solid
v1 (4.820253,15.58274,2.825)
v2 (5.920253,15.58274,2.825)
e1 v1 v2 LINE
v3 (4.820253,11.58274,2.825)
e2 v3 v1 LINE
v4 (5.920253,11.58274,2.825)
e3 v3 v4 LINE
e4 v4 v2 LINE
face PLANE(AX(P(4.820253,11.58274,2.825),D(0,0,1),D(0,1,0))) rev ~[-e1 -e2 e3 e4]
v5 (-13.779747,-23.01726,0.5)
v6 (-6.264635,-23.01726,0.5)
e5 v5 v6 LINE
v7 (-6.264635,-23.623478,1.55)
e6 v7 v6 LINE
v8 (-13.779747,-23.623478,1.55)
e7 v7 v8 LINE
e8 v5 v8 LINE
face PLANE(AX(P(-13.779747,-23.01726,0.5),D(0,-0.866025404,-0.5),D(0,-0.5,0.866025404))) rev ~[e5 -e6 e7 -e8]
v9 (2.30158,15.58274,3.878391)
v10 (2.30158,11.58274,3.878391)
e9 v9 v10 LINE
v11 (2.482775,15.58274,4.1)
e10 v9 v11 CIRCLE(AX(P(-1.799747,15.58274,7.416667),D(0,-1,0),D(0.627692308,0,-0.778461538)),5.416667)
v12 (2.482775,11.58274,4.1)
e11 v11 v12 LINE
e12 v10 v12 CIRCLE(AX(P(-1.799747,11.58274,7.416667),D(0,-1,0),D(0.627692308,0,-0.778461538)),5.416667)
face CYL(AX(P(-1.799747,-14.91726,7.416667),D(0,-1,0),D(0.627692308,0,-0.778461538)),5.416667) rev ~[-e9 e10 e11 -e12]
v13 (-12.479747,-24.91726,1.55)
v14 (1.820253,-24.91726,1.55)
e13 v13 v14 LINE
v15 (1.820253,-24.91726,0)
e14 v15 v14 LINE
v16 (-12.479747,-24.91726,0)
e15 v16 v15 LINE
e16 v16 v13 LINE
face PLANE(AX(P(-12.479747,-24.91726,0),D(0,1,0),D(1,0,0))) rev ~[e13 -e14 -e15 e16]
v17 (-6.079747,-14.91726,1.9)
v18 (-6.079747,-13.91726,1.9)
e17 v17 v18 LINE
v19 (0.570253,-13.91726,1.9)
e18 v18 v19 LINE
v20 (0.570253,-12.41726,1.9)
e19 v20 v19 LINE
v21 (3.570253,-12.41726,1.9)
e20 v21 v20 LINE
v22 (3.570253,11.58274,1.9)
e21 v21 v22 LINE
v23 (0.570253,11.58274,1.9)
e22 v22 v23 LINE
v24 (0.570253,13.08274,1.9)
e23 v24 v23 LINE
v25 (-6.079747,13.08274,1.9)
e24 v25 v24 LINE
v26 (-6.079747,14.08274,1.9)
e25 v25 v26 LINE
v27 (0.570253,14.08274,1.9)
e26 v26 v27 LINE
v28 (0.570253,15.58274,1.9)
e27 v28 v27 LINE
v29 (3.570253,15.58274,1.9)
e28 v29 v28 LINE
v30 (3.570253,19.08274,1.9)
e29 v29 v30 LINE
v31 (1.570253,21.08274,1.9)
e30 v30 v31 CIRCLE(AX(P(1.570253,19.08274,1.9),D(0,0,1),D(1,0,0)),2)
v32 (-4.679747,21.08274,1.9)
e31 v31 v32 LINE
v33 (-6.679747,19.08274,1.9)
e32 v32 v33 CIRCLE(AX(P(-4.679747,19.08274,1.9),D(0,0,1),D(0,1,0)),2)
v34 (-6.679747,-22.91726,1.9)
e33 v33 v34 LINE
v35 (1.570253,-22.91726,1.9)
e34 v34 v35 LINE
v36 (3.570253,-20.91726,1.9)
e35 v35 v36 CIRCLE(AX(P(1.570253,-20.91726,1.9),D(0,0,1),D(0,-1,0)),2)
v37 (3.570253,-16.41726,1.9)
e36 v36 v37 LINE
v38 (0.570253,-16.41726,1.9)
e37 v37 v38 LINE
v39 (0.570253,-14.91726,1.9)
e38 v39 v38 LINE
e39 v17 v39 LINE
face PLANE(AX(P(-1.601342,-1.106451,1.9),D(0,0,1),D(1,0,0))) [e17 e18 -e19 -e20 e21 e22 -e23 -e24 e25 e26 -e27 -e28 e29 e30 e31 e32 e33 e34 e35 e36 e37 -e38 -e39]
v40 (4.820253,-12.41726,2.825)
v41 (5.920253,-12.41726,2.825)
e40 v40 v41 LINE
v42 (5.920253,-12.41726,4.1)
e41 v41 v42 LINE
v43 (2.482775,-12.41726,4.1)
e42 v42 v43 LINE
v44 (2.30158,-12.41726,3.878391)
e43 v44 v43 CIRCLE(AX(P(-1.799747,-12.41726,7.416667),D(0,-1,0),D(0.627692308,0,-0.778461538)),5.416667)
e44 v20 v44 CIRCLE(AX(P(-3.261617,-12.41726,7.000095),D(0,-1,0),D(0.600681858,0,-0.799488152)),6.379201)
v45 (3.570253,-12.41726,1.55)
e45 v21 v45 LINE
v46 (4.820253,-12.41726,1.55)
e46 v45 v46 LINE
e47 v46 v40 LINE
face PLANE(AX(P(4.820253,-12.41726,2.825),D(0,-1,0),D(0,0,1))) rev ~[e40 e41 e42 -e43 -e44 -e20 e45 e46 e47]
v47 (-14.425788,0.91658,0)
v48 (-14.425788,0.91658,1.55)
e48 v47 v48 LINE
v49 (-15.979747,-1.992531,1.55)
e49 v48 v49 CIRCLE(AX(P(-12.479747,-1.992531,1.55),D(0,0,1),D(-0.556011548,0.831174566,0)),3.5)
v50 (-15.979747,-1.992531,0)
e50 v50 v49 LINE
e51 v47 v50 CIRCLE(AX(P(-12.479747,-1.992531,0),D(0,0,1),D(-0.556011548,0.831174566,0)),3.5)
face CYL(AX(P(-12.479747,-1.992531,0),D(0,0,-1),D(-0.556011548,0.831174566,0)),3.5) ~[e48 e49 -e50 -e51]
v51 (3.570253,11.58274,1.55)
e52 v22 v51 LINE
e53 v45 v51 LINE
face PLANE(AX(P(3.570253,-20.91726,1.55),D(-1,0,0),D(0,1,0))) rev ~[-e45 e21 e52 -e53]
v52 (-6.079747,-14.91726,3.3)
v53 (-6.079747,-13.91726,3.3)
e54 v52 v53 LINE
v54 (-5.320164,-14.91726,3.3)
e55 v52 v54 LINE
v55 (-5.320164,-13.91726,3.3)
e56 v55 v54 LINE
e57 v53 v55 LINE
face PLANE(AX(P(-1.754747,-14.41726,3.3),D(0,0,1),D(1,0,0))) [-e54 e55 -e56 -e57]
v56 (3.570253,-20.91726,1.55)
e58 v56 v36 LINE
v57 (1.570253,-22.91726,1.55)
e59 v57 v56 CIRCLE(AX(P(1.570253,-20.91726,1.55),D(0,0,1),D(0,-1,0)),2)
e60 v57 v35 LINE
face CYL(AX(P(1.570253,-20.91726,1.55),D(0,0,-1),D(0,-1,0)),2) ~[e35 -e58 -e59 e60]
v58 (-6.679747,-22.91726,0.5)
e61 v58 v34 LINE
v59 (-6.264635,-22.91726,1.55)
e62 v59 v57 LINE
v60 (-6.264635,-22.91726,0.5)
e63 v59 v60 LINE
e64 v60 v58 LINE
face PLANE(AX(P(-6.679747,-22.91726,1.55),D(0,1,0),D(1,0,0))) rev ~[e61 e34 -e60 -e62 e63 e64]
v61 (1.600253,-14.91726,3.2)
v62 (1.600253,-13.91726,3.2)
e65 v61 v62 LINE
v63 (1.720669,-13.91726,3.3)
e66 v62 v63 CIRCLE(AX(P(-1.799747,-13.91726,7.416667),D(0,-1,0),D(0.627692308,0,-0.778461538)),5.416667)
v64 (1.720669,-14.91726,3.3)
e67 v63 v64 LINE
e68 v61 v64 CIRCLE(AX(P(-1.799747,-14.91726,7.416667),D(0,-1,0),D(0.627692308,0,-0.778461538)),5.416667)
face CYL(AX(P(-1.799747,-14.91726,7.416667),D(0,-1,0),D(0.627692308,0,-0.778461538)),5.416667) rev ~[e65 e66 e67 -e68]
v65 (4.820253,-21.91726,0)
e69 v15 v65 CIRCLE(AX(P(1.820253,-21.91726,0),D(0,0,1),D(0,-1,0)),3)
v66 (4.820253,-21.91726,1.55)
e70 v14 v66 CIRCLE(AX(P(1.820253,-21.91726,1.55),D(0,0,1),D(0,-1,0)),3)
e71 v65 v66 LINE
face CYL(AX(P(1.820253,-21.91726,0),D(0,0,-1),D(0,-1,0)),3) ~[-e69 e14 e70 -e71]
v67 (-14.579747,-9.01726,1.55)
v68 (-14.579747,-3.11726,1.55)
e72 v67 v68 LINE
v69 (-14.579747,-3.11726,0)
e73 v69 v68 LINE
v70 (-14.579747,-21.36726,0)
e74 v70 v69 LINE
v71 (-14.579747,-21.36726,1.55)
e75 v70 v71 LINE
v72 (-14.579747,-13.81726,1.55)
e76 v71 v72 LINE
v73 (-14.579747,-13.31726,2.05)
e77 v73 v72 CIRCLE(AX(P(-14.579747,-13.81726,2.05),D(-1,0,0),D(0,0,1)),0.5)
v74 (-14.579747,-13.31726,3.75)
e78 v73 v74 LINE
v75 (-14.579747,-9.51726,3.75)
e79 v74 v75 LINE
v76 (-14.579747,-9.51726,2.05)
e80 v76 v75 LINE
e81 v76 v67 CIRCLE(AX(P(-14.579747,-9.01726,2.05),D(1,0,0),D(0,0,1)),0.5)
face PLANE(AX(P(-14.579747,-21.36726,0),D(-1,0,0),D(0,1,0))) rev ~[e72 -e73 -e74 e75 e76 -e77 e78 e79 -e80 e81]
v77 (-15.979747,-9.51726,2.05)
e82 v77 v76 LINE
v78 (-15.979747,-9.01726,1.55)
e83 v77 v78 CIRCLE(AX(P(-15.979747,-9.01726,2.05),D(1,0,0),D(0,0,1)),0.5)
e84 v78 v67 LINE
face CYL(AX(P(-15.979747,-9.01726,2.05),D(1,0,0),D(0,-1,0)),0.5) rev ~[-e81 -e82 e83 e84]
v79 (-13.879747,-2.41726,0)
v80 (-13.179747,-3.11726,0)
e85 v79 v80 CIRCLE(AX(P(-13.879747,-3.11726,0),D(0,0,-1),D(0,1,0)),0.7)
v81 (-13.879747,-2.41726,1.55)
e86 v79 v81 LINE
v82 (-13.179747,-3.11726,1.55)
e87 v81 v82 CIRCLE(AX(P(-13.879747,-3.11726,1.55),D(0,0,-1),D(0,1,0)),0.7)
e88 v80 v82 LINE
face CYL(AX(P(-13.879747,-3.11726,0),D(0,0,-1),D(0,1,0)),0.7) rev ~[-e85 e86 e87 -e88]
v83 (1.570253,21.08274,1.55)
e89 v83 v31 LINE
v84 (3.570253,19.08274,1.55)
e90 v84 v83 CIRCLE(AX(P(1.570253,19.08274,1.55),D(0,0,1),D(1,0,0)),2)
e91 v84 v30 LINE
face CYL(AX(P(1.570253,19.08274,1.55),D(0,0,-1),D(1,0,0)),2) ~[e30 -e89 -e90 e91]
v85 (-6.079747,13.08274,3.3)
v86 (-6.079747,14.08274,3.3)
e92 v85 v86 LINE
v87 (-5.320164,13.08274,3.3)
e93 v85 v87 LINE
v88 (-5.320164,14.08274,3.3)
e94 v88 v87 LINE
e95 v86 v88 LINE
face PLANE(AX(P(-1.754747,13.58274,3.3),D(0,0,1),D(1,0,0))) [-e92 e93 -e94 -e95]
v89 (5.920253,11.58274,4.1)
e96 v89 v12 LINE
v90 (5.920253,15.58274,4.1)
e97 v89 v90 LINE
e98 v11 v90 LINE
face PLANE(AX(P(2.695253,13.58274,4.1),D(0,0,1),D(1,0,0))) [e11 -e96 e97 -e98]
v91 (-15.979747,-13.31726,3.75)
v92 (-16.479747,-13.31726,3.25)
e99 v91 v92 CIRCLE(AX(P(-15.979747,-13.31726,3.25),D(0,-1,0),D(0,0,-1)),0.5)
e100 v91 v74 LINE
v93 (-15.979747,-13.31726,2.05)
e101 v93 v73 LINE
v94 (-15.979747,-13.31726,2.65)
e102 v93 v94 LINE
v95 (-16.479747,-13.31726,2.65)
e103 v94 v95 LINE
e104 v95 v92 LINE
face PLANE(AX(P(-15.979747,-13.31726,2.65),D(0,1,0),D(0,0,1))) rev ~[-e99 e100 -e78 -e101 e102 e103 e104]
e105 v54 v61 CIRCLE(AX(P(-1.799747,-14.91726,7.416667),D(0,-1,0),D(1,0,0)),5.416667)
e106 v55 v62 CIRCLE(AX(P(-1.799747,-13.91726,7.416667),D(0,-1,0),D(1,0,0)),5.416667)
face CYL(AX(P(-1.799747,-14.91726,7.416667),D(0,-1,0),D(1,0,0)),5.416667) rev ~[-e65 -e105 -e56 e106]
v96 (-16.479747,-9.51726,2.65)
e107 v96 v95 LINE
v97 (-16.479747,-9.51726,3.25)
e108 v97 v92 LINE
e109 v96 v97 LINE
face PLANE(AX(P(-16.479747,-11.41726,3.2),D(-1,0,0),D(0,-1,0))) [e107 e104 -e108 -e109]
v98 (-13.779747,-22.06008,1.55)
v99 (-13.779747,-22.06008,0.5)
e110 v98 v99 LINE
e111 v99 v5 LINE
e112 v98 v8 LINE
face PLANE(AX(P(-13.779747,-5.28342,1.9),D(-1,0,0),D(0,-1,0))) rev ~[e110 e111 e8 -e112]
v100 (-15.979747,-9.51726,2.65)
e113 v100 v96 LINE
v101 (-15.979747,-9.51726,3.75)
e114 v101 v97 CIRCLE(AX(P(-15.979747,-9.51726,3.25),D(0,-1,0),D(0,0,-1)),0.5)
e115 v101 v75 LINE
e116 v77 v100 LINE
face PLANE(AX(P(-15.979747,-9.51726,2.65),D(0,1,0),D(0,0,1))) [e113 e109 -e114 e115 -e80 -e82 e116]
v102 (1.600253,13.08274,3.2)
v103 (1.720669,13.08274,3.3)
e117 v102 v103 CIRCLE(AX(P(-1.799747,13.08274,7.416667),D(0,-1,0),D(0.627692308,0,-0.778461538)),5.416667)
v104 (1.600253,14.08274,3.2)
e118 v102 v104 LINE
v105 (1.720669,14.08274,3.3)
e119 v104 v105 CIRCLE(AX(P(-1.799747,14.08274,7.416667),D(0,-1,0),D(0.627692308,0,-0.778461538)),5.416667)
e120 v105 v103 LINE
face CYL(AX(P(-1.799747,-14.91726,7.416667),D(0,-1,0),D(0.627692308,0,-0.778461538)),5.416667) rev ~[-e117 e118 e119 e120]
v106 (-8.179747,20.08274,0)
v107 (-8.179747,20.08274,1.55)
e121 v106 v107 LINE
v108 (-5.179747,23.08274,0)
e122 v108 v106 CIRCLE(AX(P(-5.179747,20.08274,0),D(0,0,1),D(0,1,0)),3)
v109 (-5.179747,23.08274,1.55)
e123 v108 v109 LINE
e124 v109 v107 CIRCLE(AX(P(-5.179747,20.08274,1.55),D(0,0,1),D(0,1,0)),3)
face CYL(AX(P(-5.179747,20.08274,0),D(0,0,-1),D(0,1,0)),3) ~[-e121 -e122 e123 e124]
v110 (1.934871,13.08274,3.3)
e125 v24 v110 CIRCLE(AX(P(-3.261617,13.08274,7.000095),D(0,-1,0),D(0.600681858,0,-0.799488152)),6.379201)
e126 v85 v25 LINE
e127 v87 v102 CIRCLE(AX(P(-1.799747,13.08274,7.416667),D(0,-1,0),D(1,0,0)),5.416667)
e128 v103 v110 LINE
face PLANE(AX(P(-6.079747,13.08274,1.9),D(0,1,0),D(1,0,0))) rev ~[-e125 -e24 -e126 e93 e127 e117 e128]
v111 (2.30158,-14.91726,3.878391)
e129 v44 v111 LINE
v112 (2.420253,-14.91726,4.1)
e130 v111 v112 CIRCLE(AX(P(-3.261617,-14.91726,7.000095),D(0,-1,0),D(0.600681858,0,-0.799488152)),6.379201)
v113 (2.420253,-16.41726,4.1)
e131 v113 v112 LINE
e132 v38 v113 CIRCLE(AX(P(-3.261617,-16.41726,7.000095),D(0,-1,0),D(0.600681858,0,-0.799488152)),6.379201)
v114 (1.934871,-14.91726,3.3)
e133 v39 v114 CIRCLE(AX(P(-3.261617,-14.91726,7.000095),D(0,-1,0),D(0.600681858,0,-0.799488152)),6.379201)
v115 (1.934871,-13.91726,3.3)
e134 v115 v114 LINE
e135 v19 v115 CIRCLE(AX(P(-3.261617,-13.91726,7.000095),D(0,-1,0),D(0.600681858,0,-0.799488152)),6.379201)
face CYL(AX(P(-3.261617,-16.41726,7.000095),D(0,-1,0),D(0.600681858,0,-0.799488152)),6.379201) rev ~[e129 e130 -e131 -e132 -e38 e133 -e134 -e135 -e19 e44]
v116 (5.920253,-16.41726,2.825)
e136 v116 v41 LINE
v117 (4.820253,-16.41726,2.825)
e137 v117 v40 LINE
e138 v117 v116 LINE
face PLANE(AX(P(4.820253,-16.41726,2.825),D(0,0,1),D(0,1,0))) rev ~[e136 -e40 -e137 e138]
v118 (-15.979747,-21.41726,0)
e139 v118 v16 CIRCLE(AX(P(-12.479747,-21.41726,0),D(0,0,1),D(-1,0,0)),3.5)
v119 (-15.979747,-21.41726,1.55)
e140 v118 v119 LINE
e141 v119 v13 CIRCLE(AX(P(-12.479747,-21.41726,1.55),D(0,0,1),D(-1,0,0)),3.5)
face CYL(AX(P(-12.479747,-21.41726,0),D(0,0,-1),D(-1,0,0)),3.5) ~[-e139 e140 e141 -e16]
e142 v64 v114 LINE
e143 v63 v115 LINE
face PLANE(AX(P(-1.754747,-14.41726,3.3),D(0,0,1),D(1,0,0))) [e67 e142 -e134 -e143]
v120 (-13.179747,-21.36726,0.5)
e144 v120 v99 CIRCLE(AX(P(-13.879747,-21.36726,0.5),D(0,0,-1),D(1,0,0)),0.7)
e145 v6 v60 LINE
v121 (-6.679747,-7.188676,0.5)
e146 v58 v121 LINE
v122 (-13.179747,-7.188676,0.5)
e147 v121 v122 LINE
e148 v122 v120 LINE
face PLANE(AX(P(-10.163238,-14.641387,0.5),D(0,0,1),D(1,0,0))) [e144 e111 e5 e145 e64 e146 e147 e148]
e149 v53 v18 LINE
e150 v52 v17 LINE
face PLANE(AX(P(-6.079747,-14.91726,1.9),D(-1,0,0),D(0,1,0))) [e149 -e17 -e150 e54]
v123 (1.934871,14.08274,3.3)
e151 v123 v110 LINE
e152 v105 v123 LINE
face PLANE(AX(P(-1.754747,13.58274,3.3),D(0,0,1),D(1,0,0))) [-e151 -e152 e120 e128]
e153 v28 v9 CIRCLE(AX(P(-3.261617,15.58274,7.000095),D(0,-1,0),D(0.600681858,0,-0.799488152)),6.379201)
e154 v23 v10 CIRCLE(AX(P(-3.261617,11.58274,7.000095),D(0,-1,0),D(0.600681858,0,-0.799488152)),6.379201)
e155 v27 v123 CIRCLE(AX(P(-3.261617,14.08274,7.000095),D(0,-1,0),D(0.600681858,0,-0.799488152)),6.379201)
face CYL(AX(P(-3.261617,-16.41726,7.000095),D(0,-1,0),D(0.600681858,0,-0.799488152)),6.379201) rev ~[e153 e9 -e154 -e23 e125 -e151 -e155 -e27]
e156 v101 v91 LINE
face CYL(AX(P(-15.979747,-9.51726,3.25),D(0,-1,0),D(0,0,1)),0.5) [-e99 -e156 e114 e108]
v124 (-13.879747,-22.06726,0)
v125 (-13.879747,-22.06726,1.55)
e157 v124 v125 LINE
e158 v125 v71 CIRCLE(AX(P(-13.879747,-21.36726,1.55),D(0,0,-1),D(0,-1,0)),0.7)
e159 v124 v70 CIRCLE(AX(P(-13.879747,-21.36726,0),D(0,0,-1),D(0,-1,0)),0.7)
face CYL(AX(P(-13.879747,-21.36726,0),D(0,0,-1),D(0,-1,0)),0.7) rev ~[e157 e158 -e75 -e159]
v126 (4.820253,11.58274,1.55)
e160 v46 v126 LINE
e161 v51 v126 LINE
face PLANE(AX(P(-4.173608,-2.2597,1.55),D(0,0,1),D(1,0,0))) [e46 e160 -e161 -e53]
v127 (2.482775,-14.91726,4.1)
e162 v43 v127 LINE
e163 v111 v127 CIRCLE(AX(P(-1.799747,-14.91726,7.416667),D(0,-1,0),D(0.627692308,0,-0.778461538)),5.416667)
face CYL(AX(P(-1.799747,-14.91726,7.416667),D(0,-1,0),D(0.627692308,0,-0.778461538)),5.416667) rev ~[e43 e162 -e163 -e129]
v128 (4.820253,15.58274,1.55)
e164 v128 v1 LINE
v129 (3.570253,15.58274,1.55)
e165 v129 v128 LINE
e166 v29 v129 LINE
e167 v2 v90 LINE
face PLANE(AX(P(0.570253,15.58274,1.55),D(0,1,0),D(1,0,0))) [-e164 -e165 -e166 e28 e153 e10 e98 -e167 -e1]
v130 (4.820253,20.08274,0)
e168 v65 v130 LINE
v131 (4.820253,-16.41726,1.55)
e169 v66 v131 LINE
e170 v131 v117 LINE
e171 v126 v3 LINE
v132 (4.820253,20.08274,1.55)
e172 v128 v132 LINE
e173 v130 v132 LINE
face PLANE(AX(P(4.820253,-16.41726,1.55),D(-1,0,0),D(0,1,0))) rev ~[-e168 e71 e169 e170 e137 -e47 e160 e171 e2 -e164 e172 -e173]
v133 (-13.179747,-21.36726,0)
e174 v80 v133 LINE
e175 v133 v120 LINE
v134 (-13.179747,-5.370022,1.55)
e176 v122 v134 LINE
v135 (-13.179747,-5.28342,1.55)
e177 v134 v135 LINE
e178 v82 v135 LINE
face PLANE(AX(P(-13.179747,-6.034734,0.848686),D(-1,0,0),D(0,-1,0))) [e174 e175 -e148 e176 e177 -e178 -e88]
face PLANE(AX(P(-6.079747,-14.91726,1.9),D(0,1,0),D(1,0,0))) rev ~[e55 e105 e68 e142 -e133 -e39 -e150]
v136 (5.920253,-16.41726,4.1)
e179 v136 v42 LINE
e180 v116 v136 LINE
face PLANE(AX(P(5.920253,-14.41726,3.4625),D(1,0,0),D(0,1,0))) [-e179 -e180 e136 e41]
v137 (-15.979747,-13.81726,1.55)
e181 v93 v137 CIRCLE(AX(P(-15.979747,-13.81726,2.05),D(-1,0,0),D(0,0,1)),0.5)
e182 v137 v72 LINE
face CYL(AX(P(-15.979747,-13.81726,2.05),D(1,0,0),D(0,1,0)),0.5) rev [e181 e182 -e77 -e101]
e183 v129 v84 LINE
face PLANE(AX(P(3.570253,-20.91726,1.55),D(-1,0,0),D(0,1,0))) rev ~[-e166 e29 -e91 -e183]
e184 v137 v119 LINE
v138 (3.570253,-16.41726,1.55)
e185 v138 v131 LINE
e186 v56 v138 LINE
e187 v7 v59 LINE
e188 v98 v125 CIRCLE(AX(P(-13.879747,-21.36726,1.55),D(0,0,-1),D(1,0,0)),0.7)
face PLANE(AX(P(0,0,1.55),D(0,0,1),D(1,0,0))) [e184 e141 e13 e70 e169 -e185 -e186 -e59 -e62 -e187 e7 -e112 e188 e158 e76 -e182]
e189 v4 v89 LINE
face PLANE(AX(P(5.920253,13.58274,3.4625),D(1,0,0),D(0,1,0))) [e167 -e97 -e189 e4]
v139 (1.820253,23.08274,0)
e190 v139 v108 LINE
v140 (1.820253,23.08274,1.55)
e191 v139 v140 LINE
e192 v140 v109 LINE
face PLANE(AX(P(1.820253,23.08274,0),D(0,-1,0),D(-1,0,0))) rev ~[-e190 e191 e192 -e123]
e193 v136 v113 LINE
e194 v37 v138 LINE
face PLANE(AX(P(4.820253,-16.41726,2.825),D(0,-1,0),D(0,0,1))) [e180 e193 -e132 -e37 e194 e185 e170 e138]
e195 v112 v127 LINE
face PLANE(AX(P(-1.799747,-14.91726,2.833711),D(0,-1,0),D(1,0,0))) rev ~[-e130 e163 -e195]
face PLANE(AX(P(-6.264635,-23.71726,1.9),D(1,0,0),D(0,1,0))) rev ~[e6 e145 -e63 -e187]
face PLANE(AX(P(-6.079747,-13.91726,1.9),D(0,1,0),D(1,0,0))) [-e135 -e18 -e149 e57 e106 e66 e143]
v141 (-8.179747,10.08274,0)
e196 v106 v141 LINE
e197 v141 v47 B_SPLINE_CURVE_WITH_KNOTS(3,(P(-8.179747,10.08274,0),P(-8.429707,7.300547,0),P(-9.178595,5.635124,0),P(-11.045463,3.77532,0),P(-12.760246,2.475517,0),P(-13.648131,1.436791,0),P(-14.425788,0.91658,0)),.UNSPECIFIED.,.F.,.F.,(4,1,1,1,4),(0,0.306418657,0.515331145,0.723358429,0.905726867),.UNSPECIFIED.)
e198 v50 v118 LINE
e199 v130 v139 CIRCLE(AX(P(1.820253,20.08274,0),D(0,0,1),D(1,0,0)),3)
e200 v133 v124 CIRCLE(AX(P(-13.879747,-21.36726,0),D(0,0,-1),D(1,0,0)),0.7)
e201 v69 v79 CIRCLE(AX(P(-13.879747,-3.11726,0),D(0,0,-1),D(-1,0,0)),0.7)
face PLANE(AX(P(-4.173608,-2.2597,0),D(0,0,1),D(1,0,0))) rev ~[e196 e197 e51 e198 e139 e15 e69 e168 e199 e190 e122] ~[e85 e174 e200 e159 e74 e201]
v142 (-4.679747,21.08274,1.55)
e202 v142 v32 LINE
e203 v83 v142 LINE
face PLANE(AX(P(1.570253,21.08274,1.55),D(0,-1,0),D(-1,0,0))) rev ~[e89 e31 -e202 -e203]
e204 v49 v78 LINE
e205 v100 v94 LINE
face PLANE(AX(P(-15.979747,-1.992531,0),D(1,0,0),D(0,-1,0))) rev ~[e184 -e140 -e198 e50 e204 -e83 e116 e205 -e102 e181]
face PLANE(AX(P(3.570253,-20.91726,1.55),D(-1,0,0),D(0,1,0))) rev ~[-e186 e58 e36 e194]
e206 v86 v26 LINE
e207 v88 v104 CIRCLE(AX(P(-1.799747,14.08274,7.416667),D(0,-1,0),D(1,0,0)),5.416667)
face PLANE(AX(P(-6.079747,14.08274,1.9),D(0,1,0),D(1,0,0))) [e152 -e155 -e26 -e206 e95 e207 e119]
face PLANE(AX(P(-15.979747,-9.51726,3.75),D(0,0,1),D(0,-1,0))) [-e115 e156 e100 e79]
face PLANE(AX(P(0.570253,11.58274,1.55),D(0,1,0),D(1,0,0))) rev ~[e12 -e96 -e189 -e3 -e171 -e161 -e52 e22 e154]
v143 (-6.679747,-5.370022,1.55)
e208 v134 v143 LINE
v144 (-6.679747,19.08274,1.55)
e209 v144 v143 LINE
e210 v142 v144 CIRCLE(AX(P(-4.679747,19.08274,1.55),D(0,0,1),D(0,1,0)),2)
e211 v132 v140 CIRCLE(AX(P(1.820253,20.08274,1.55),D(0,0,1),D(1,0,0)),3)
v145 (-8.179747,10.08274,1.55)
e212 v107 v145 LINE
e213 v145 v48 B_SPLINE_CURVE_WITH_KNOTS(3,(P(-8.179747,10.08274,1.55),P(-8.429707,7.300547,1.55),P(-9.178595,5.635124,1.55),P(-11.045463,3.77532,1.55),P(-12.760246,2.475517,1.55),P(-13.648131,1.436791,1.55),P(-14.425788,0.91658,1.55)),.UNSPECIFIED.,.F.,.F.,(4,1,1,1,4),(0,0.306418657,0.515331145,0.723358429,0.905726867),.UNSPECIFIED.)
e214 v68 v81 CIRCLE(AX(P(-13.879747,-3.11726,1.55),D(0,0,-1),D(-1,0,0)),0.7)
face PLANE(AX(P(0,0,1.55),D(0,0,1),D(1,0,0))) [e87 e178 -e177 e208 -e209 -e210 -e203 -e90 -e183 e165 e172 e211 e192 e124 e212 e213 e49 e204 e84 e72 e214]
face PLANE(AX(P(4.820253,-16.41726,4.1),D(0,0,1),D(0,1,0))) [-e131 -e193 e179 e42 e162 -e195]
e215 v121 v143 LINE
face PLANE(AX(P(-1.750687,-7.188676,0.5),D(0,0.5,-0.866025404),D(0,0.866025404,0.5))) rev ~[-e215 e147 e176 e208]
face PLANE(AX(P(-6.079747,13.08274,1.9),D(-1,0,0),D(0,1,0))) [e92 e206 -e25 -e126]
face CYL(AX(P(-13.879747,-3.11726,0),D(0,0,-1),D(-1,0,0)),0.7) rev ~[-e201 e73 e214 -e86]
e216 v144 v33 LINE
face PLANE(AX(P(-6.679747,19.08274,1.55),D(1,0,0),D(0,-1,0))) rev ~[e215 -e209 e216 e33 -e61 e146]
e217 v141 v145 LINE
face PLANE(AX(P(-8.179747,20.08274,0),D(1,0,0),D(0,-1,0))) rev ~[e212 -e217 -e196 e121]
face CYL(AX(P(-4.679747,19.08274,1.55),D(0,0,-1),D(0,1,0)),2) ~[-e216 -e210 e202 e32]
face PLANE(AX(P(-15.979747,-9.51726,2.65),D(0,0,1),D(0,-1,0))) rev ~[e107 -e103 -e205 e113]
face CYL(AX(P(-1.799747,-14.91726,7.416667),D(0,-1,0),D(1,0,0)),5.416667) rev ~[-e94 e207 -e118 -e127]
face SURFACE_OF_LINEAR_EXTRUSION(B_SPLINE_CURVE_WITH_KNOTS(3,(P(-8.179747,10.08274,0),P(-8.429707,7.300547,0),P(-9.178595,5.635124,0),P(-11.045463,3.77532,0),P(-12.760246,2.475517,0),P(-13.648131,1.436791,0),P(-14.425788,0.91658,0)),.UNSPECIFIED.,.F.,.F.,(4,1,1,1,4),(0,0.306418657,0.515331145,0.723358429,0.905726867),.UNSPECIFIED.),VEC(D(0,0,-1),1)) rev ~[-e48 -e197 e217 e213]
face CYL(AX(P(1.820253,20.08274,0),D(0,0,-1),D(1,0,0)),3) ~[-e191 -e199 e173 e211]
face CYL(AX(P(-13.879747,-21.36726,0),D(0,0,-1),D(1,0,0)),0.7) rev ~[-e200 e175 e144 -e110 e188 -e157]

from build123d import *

# Parameters (mm, degrees)
F1_DEPTH     = 1.55
F3_DEPTH     = 0.35
F4_W         = 8.65
F4_H         = 1
F5_DEPTH     = 1.3
F7_W         = 4.25
F7_H         = 4
F8_DEPTH     = 2.55
F10_DEPTH    = 39.5010001
F11_W        = 4
F11_H        = 1.275
F12_DEPTH    = 1.1
F13_W        = 8.65
F13_H        = 1
F14_DEPTH    = 1.4
F15_DEPTH    = 38.0010001
F17_DEPTH    = 1.4
F18_T4_DEPTH = 11.4290603676
F19_T4_DEPTH = 10.6517870966
F20_W        = 1.4
F20_H        = 3.8
F21_DEPTH    = 2.2
F22_W        = 3.8
F22_H        = 1.1
F23_DEPTH    = 0.5
F24_R        = 0.5


# Not quite as in the source:
# - a fillet or chamfer that OpenCascade refuses, or shapes differently, is made with other operations: its cross-section is extruded or revolved along the edge and cut away or added


with BuildPart() as f1:
    # F0 (on Top) → F1 (new body)
    with BuildSketch(Plane.XY):
        with BuildLine():
            Line((-12.4797472133, -24.9172599055), (1.8202527867, -24.9172599055))
            ThreePointArc((1.8202527867, -24.9172599055), (3.9415731303, -24.038580249), (4.8202527867, -21.9172599055))
            Line((4.8202527867, -21.9172599055), (4.8202527867, 20.0827400945))
            ThreePointArc((4.8202527867, 20.0827400945), (3.9415731303, 22.2040604381), (1.8202527867, 23.0827400945))
            Line((1.8202527867, 23.0827400945), (-5.1797472133, 23.0827400945))
            ThreePointArc((-5.1797472133, 23.0827400945), (-7.3010675568, 22.2040604381), (-8.1797472133, 20.0827400945))
            Line((-8.1797472133, 20.0827400945), (-8.1797472133, 10.0827400945))
            add(Edge.make_bspline(
                [(-8.1797472133, 10.0827400945), (-8.4297074571, 7.300546721), (-9.1785947804, 5.6351239407), (-11.0454632546, 3.7753203501), (-12.7602456599, 2.4755173938), (-13.6481305175, 1.4367913649), (-14.42578763, 0.9165801451)],
                knots=[0, 0, 0, 0, 0.3064186573, 0.5153311453, 0.7233584291, 0.9057268673, 0.9057268673, 0.9057268673, 0.9057268673], degree=3))
            ThreePointArc((-14.42578763, 0.9165801451), (-15.5669094587, -0.3434616219), (-15.9797472133, -1.9925308353))
            Line((-15.9797472133, -1.9925308353), (-15.9797472133, -21.4172599055))
            ThreePointArc((-15.9797472133, -21.4172599055), (-14.9546209474, -23.8921336396), (-12.4797472133, -24.9172599055))
        make_face()
        with BuildLine():
            Line((-14.5797472133, -21.3672599055), (-14.5797472133, -3.1172599055))
            ThreePointArc((-14.5797472133, -3.1172599055), (-14.3747219601, -2.6222851587), (-13.8797472133, -2.4172599055))
            ThreePointArc((-13.8797472133, -2.4172599055), (-13.3847724664, -2.6222851587), (-13.1797472133, -3.1172599055))
            Line((-13.1797472133, -3.1172599055), (-13.1797472133, -21.3672599055))
            ThreePointArc((-13.1797472133, -21.3672599055), (-13.3847724664, -21.8622346523), (-13.8797472133, -22.0672599055))
            ThreePointArc((-13.8797472133, -22.0672599055), (-14.3747219601, -21.8622346523), (-14.5797472133, -21.3672599055))
        make_face(mode=Mode.SUBTRACT)
    extrude(amount=F1_DEPTH)

    # F2 (on face) → F3 (join)
    with BuildSketch(Plane.XY.offset(1.55)):
        with BuildLine():
            Line((1.5702527867, 21.0827400945), (-4.6797472133, 21.0827400945))
            ThreePointArc((-4.6797472133, 21.0827400945), (-6.0939607756, 20.4969536569), (-6.6797472133, 19.0827400945))
            Line((-6.6797472133, 19.0827400945), (-6.6797472133, -22.9172599055))
            Line((-6.6797472133, -22.9172599055), (1.5702527867, -22.9172599055))
            ThreePointArc((1.5702527867, -22.9172599055), (2.9844663491, -22.3314734679), (3.5702527867, -20.9172599055))
            Line((3.5702527867, -20.9172599055), (3.5702527867, 19.0827400945))
            ThreePointArc((3.5702527867, 19.0827400945), (2.9844663491, 20.4969536569), (1.5702527867, 21.0827400945))
        make_face()
    extrude(amount=F3_DEPTH)

    # F4 (on face) → F5 (join)
    with BuildSketch(Plane.XY.offset(1.9)):
        with Locations((-1.7547472133, 13.5827400945)):
            Rectangle(F4_W, F4_H)
        with Locations((-1.7547472133, -14.4172599055)):
            Rectangle(F4_W, F4_H)
    extrude(amount=F5_DEPTH)

    # F7 (on face) → F8 (join)
    with BuildSketch(Plane.XY.offset(1.55)):
        with Locations((2.6952527867, -14.4172599055)):
            Rectangle(F7_W, F7_H)
        with Locations((2.6952527867, 13.5827400945)):
            Rectangle(F7_W, F7_H)
    extrude(amount=F8_DEPTH)

    # F9 (on face) → F10 (cut, through all)
    with BuildSketch(Plane.XZ.offset(16.4172599055)):
        with BuildLine():
            Line((0.5702527867, 4.1), (0.5702527867, 1.9))
            ThreePointArc((0.5702527867, 1.9), (1.620780987, 2.8944421952), (2.4202527867, 4.1))
            Line((2.4202527867, 4.1), (0.5702527867, 4.1))
        make_face()
    extrude(amount=-F10_DEPTH, mode=Mode.SUBTRACT)

    # F11 (on face) → F12 (join)
    with BuildSketch(Plane.YZ.offset(4.8202527867)):
        with Locations((-14.4172599055, 3.4625)):
            Rectangle(F11_W, F11_H)
        with Locations((13.5827400945, 3.4625)):
            Rectangle(F11_W, F11_H)
    extrude(amount=F12_DEPTH)

    # F13 (on face) → F14 (join)
    with BuildSketch(Plane.XY.offset(1.9)):
        with Locations((-1.7547472133, -14.4172599055)):
            Rectangle(F13_W, F13_H)
        with Locations((-1.7547472133, 13.5827400945)):
            Rectangle(F13_W, F13_H)
    extrude(amount=F14_DEPTH)

    # F6 (on face) → F15 (cut, through all)
    with BuildSketch(Plane.XZ.offset(14.9172599055)):
        with BuildLine():
            Line((1.6002527867, 3.2), (-5.1997472133, 3.2))
            ThreePointArc((-5.1997472133, 3.2), (-1.7997472133, 2), (1.6002527867, 3.2))
        make_face()
        with BuildLine():
            ThreePointArc((3.6169194534, 7.4166666667), (-4.1367978237, 12.3032270339), (-5.1997472133, 3.2))
            Line((-5.1997472133, 3.2), (1.6002527867, 3.2))
            ThreePointArc((1.6002527867, 3.2), (3.0868131539, 5.0796160563), (3.6169194534, 7.4166666667))
        make_face()
    extrude(amount=-F15_DEPTH, mode=Mode.SUBTRACT)

    # F16 (on face) → F17 (cut)
    with BuildSketch(Plane.XY.offset(1.9)):
        Polygon((-6.6797472133, -22.9172599055), (-6.6797472133, -5.2834198549), (-13.1797472133, -5.2834198549), (-13.7797472133, -5.2834198549), (-13.7797472133, -23.7172599055), (-6.2646348961, -23.7172599055), (-6.2646348961, -22.9172599055), align=None)
    extrude(amount=-F17_DEPTH, mode=Mode.SUBTRACT)

    # F18: chamfer of 1.1 x 1.9052558883 on 1 edges, made by hand


with BuildPart() as f18_tool2:
    # F18_s3 → F18_t4 (new body)
    with BuildSketch(Plane.YZ.offset(-1.7506868456)):
        Polygon((-7.1886757432, 0.5), (-5.2834198549, 1.6), (-5.2834198549, 0.5), align=None)
    extrude(amount=-F18_T4_DEPTH)

    split(bisect_by=Plane.XY.offset(1.55), keep=Keep.BOTTOM)


with BuildPart() as f1_1:
    add(f1.part)

    # F18_t1: union F18_tool2
    add(f18_tool2.part)

    # F19: chamfer of 0.7 x 1.2124355653 on 1 edges, made by hand


with BuildPart() as f19_tool2:
    # F19_s3 → F19_t4 (new body)
    with BuildSketch(Plane.YZ.offset(-13.7797472133)):
        Polygon((-23.0172599055, 0.5), (-23.7172599055, 1.7124355653), (-23.7172599055, 0.5), align=None)
    extrude(amount=F19_T4_DEPTH)

    split(bisect_by=Plane.XY.offset(1.55), keep=Keep.BOTTOM)


with BuildPart() as f1_2:
    add(f1_1.part)

    # F19_t1: union F19_tool2
    add(f19_tool2.part)

    # F20 (on face) → F21 (join)
    with BuildSketch(Plane.XY.offset(1.55)):
        with Locations((-15.2797472133, -11.4172599055)):
            Rectangle(F20_W, F20_H)
    extrude(amount=F21_DEPTH)

    # F22 (on face) → F23 (join)
    with BuildSketch(Plane(origin=(-15.9797472133, 0, 0), x_dir=(0, -1, 0), z_dir=(-1, 0, 0))):
        with Locations((11.4172599055, 3.2)):
            Rectangle(F22_W, F22_H)
    extrude(amount=F23_DEPTH)

    # F24
    f24_edges = [f1_2.edges().sort_by_distance(p)[0] for p in [
        (-15.279747, -13.31726, 1.55),
        (-15.279747, -9.51726, 1.55),
        (-16.479747, -11.41726, 3.75),
    ]]
    fillet(f24_edges, radius=F24_R)


solid = f1_2.part
